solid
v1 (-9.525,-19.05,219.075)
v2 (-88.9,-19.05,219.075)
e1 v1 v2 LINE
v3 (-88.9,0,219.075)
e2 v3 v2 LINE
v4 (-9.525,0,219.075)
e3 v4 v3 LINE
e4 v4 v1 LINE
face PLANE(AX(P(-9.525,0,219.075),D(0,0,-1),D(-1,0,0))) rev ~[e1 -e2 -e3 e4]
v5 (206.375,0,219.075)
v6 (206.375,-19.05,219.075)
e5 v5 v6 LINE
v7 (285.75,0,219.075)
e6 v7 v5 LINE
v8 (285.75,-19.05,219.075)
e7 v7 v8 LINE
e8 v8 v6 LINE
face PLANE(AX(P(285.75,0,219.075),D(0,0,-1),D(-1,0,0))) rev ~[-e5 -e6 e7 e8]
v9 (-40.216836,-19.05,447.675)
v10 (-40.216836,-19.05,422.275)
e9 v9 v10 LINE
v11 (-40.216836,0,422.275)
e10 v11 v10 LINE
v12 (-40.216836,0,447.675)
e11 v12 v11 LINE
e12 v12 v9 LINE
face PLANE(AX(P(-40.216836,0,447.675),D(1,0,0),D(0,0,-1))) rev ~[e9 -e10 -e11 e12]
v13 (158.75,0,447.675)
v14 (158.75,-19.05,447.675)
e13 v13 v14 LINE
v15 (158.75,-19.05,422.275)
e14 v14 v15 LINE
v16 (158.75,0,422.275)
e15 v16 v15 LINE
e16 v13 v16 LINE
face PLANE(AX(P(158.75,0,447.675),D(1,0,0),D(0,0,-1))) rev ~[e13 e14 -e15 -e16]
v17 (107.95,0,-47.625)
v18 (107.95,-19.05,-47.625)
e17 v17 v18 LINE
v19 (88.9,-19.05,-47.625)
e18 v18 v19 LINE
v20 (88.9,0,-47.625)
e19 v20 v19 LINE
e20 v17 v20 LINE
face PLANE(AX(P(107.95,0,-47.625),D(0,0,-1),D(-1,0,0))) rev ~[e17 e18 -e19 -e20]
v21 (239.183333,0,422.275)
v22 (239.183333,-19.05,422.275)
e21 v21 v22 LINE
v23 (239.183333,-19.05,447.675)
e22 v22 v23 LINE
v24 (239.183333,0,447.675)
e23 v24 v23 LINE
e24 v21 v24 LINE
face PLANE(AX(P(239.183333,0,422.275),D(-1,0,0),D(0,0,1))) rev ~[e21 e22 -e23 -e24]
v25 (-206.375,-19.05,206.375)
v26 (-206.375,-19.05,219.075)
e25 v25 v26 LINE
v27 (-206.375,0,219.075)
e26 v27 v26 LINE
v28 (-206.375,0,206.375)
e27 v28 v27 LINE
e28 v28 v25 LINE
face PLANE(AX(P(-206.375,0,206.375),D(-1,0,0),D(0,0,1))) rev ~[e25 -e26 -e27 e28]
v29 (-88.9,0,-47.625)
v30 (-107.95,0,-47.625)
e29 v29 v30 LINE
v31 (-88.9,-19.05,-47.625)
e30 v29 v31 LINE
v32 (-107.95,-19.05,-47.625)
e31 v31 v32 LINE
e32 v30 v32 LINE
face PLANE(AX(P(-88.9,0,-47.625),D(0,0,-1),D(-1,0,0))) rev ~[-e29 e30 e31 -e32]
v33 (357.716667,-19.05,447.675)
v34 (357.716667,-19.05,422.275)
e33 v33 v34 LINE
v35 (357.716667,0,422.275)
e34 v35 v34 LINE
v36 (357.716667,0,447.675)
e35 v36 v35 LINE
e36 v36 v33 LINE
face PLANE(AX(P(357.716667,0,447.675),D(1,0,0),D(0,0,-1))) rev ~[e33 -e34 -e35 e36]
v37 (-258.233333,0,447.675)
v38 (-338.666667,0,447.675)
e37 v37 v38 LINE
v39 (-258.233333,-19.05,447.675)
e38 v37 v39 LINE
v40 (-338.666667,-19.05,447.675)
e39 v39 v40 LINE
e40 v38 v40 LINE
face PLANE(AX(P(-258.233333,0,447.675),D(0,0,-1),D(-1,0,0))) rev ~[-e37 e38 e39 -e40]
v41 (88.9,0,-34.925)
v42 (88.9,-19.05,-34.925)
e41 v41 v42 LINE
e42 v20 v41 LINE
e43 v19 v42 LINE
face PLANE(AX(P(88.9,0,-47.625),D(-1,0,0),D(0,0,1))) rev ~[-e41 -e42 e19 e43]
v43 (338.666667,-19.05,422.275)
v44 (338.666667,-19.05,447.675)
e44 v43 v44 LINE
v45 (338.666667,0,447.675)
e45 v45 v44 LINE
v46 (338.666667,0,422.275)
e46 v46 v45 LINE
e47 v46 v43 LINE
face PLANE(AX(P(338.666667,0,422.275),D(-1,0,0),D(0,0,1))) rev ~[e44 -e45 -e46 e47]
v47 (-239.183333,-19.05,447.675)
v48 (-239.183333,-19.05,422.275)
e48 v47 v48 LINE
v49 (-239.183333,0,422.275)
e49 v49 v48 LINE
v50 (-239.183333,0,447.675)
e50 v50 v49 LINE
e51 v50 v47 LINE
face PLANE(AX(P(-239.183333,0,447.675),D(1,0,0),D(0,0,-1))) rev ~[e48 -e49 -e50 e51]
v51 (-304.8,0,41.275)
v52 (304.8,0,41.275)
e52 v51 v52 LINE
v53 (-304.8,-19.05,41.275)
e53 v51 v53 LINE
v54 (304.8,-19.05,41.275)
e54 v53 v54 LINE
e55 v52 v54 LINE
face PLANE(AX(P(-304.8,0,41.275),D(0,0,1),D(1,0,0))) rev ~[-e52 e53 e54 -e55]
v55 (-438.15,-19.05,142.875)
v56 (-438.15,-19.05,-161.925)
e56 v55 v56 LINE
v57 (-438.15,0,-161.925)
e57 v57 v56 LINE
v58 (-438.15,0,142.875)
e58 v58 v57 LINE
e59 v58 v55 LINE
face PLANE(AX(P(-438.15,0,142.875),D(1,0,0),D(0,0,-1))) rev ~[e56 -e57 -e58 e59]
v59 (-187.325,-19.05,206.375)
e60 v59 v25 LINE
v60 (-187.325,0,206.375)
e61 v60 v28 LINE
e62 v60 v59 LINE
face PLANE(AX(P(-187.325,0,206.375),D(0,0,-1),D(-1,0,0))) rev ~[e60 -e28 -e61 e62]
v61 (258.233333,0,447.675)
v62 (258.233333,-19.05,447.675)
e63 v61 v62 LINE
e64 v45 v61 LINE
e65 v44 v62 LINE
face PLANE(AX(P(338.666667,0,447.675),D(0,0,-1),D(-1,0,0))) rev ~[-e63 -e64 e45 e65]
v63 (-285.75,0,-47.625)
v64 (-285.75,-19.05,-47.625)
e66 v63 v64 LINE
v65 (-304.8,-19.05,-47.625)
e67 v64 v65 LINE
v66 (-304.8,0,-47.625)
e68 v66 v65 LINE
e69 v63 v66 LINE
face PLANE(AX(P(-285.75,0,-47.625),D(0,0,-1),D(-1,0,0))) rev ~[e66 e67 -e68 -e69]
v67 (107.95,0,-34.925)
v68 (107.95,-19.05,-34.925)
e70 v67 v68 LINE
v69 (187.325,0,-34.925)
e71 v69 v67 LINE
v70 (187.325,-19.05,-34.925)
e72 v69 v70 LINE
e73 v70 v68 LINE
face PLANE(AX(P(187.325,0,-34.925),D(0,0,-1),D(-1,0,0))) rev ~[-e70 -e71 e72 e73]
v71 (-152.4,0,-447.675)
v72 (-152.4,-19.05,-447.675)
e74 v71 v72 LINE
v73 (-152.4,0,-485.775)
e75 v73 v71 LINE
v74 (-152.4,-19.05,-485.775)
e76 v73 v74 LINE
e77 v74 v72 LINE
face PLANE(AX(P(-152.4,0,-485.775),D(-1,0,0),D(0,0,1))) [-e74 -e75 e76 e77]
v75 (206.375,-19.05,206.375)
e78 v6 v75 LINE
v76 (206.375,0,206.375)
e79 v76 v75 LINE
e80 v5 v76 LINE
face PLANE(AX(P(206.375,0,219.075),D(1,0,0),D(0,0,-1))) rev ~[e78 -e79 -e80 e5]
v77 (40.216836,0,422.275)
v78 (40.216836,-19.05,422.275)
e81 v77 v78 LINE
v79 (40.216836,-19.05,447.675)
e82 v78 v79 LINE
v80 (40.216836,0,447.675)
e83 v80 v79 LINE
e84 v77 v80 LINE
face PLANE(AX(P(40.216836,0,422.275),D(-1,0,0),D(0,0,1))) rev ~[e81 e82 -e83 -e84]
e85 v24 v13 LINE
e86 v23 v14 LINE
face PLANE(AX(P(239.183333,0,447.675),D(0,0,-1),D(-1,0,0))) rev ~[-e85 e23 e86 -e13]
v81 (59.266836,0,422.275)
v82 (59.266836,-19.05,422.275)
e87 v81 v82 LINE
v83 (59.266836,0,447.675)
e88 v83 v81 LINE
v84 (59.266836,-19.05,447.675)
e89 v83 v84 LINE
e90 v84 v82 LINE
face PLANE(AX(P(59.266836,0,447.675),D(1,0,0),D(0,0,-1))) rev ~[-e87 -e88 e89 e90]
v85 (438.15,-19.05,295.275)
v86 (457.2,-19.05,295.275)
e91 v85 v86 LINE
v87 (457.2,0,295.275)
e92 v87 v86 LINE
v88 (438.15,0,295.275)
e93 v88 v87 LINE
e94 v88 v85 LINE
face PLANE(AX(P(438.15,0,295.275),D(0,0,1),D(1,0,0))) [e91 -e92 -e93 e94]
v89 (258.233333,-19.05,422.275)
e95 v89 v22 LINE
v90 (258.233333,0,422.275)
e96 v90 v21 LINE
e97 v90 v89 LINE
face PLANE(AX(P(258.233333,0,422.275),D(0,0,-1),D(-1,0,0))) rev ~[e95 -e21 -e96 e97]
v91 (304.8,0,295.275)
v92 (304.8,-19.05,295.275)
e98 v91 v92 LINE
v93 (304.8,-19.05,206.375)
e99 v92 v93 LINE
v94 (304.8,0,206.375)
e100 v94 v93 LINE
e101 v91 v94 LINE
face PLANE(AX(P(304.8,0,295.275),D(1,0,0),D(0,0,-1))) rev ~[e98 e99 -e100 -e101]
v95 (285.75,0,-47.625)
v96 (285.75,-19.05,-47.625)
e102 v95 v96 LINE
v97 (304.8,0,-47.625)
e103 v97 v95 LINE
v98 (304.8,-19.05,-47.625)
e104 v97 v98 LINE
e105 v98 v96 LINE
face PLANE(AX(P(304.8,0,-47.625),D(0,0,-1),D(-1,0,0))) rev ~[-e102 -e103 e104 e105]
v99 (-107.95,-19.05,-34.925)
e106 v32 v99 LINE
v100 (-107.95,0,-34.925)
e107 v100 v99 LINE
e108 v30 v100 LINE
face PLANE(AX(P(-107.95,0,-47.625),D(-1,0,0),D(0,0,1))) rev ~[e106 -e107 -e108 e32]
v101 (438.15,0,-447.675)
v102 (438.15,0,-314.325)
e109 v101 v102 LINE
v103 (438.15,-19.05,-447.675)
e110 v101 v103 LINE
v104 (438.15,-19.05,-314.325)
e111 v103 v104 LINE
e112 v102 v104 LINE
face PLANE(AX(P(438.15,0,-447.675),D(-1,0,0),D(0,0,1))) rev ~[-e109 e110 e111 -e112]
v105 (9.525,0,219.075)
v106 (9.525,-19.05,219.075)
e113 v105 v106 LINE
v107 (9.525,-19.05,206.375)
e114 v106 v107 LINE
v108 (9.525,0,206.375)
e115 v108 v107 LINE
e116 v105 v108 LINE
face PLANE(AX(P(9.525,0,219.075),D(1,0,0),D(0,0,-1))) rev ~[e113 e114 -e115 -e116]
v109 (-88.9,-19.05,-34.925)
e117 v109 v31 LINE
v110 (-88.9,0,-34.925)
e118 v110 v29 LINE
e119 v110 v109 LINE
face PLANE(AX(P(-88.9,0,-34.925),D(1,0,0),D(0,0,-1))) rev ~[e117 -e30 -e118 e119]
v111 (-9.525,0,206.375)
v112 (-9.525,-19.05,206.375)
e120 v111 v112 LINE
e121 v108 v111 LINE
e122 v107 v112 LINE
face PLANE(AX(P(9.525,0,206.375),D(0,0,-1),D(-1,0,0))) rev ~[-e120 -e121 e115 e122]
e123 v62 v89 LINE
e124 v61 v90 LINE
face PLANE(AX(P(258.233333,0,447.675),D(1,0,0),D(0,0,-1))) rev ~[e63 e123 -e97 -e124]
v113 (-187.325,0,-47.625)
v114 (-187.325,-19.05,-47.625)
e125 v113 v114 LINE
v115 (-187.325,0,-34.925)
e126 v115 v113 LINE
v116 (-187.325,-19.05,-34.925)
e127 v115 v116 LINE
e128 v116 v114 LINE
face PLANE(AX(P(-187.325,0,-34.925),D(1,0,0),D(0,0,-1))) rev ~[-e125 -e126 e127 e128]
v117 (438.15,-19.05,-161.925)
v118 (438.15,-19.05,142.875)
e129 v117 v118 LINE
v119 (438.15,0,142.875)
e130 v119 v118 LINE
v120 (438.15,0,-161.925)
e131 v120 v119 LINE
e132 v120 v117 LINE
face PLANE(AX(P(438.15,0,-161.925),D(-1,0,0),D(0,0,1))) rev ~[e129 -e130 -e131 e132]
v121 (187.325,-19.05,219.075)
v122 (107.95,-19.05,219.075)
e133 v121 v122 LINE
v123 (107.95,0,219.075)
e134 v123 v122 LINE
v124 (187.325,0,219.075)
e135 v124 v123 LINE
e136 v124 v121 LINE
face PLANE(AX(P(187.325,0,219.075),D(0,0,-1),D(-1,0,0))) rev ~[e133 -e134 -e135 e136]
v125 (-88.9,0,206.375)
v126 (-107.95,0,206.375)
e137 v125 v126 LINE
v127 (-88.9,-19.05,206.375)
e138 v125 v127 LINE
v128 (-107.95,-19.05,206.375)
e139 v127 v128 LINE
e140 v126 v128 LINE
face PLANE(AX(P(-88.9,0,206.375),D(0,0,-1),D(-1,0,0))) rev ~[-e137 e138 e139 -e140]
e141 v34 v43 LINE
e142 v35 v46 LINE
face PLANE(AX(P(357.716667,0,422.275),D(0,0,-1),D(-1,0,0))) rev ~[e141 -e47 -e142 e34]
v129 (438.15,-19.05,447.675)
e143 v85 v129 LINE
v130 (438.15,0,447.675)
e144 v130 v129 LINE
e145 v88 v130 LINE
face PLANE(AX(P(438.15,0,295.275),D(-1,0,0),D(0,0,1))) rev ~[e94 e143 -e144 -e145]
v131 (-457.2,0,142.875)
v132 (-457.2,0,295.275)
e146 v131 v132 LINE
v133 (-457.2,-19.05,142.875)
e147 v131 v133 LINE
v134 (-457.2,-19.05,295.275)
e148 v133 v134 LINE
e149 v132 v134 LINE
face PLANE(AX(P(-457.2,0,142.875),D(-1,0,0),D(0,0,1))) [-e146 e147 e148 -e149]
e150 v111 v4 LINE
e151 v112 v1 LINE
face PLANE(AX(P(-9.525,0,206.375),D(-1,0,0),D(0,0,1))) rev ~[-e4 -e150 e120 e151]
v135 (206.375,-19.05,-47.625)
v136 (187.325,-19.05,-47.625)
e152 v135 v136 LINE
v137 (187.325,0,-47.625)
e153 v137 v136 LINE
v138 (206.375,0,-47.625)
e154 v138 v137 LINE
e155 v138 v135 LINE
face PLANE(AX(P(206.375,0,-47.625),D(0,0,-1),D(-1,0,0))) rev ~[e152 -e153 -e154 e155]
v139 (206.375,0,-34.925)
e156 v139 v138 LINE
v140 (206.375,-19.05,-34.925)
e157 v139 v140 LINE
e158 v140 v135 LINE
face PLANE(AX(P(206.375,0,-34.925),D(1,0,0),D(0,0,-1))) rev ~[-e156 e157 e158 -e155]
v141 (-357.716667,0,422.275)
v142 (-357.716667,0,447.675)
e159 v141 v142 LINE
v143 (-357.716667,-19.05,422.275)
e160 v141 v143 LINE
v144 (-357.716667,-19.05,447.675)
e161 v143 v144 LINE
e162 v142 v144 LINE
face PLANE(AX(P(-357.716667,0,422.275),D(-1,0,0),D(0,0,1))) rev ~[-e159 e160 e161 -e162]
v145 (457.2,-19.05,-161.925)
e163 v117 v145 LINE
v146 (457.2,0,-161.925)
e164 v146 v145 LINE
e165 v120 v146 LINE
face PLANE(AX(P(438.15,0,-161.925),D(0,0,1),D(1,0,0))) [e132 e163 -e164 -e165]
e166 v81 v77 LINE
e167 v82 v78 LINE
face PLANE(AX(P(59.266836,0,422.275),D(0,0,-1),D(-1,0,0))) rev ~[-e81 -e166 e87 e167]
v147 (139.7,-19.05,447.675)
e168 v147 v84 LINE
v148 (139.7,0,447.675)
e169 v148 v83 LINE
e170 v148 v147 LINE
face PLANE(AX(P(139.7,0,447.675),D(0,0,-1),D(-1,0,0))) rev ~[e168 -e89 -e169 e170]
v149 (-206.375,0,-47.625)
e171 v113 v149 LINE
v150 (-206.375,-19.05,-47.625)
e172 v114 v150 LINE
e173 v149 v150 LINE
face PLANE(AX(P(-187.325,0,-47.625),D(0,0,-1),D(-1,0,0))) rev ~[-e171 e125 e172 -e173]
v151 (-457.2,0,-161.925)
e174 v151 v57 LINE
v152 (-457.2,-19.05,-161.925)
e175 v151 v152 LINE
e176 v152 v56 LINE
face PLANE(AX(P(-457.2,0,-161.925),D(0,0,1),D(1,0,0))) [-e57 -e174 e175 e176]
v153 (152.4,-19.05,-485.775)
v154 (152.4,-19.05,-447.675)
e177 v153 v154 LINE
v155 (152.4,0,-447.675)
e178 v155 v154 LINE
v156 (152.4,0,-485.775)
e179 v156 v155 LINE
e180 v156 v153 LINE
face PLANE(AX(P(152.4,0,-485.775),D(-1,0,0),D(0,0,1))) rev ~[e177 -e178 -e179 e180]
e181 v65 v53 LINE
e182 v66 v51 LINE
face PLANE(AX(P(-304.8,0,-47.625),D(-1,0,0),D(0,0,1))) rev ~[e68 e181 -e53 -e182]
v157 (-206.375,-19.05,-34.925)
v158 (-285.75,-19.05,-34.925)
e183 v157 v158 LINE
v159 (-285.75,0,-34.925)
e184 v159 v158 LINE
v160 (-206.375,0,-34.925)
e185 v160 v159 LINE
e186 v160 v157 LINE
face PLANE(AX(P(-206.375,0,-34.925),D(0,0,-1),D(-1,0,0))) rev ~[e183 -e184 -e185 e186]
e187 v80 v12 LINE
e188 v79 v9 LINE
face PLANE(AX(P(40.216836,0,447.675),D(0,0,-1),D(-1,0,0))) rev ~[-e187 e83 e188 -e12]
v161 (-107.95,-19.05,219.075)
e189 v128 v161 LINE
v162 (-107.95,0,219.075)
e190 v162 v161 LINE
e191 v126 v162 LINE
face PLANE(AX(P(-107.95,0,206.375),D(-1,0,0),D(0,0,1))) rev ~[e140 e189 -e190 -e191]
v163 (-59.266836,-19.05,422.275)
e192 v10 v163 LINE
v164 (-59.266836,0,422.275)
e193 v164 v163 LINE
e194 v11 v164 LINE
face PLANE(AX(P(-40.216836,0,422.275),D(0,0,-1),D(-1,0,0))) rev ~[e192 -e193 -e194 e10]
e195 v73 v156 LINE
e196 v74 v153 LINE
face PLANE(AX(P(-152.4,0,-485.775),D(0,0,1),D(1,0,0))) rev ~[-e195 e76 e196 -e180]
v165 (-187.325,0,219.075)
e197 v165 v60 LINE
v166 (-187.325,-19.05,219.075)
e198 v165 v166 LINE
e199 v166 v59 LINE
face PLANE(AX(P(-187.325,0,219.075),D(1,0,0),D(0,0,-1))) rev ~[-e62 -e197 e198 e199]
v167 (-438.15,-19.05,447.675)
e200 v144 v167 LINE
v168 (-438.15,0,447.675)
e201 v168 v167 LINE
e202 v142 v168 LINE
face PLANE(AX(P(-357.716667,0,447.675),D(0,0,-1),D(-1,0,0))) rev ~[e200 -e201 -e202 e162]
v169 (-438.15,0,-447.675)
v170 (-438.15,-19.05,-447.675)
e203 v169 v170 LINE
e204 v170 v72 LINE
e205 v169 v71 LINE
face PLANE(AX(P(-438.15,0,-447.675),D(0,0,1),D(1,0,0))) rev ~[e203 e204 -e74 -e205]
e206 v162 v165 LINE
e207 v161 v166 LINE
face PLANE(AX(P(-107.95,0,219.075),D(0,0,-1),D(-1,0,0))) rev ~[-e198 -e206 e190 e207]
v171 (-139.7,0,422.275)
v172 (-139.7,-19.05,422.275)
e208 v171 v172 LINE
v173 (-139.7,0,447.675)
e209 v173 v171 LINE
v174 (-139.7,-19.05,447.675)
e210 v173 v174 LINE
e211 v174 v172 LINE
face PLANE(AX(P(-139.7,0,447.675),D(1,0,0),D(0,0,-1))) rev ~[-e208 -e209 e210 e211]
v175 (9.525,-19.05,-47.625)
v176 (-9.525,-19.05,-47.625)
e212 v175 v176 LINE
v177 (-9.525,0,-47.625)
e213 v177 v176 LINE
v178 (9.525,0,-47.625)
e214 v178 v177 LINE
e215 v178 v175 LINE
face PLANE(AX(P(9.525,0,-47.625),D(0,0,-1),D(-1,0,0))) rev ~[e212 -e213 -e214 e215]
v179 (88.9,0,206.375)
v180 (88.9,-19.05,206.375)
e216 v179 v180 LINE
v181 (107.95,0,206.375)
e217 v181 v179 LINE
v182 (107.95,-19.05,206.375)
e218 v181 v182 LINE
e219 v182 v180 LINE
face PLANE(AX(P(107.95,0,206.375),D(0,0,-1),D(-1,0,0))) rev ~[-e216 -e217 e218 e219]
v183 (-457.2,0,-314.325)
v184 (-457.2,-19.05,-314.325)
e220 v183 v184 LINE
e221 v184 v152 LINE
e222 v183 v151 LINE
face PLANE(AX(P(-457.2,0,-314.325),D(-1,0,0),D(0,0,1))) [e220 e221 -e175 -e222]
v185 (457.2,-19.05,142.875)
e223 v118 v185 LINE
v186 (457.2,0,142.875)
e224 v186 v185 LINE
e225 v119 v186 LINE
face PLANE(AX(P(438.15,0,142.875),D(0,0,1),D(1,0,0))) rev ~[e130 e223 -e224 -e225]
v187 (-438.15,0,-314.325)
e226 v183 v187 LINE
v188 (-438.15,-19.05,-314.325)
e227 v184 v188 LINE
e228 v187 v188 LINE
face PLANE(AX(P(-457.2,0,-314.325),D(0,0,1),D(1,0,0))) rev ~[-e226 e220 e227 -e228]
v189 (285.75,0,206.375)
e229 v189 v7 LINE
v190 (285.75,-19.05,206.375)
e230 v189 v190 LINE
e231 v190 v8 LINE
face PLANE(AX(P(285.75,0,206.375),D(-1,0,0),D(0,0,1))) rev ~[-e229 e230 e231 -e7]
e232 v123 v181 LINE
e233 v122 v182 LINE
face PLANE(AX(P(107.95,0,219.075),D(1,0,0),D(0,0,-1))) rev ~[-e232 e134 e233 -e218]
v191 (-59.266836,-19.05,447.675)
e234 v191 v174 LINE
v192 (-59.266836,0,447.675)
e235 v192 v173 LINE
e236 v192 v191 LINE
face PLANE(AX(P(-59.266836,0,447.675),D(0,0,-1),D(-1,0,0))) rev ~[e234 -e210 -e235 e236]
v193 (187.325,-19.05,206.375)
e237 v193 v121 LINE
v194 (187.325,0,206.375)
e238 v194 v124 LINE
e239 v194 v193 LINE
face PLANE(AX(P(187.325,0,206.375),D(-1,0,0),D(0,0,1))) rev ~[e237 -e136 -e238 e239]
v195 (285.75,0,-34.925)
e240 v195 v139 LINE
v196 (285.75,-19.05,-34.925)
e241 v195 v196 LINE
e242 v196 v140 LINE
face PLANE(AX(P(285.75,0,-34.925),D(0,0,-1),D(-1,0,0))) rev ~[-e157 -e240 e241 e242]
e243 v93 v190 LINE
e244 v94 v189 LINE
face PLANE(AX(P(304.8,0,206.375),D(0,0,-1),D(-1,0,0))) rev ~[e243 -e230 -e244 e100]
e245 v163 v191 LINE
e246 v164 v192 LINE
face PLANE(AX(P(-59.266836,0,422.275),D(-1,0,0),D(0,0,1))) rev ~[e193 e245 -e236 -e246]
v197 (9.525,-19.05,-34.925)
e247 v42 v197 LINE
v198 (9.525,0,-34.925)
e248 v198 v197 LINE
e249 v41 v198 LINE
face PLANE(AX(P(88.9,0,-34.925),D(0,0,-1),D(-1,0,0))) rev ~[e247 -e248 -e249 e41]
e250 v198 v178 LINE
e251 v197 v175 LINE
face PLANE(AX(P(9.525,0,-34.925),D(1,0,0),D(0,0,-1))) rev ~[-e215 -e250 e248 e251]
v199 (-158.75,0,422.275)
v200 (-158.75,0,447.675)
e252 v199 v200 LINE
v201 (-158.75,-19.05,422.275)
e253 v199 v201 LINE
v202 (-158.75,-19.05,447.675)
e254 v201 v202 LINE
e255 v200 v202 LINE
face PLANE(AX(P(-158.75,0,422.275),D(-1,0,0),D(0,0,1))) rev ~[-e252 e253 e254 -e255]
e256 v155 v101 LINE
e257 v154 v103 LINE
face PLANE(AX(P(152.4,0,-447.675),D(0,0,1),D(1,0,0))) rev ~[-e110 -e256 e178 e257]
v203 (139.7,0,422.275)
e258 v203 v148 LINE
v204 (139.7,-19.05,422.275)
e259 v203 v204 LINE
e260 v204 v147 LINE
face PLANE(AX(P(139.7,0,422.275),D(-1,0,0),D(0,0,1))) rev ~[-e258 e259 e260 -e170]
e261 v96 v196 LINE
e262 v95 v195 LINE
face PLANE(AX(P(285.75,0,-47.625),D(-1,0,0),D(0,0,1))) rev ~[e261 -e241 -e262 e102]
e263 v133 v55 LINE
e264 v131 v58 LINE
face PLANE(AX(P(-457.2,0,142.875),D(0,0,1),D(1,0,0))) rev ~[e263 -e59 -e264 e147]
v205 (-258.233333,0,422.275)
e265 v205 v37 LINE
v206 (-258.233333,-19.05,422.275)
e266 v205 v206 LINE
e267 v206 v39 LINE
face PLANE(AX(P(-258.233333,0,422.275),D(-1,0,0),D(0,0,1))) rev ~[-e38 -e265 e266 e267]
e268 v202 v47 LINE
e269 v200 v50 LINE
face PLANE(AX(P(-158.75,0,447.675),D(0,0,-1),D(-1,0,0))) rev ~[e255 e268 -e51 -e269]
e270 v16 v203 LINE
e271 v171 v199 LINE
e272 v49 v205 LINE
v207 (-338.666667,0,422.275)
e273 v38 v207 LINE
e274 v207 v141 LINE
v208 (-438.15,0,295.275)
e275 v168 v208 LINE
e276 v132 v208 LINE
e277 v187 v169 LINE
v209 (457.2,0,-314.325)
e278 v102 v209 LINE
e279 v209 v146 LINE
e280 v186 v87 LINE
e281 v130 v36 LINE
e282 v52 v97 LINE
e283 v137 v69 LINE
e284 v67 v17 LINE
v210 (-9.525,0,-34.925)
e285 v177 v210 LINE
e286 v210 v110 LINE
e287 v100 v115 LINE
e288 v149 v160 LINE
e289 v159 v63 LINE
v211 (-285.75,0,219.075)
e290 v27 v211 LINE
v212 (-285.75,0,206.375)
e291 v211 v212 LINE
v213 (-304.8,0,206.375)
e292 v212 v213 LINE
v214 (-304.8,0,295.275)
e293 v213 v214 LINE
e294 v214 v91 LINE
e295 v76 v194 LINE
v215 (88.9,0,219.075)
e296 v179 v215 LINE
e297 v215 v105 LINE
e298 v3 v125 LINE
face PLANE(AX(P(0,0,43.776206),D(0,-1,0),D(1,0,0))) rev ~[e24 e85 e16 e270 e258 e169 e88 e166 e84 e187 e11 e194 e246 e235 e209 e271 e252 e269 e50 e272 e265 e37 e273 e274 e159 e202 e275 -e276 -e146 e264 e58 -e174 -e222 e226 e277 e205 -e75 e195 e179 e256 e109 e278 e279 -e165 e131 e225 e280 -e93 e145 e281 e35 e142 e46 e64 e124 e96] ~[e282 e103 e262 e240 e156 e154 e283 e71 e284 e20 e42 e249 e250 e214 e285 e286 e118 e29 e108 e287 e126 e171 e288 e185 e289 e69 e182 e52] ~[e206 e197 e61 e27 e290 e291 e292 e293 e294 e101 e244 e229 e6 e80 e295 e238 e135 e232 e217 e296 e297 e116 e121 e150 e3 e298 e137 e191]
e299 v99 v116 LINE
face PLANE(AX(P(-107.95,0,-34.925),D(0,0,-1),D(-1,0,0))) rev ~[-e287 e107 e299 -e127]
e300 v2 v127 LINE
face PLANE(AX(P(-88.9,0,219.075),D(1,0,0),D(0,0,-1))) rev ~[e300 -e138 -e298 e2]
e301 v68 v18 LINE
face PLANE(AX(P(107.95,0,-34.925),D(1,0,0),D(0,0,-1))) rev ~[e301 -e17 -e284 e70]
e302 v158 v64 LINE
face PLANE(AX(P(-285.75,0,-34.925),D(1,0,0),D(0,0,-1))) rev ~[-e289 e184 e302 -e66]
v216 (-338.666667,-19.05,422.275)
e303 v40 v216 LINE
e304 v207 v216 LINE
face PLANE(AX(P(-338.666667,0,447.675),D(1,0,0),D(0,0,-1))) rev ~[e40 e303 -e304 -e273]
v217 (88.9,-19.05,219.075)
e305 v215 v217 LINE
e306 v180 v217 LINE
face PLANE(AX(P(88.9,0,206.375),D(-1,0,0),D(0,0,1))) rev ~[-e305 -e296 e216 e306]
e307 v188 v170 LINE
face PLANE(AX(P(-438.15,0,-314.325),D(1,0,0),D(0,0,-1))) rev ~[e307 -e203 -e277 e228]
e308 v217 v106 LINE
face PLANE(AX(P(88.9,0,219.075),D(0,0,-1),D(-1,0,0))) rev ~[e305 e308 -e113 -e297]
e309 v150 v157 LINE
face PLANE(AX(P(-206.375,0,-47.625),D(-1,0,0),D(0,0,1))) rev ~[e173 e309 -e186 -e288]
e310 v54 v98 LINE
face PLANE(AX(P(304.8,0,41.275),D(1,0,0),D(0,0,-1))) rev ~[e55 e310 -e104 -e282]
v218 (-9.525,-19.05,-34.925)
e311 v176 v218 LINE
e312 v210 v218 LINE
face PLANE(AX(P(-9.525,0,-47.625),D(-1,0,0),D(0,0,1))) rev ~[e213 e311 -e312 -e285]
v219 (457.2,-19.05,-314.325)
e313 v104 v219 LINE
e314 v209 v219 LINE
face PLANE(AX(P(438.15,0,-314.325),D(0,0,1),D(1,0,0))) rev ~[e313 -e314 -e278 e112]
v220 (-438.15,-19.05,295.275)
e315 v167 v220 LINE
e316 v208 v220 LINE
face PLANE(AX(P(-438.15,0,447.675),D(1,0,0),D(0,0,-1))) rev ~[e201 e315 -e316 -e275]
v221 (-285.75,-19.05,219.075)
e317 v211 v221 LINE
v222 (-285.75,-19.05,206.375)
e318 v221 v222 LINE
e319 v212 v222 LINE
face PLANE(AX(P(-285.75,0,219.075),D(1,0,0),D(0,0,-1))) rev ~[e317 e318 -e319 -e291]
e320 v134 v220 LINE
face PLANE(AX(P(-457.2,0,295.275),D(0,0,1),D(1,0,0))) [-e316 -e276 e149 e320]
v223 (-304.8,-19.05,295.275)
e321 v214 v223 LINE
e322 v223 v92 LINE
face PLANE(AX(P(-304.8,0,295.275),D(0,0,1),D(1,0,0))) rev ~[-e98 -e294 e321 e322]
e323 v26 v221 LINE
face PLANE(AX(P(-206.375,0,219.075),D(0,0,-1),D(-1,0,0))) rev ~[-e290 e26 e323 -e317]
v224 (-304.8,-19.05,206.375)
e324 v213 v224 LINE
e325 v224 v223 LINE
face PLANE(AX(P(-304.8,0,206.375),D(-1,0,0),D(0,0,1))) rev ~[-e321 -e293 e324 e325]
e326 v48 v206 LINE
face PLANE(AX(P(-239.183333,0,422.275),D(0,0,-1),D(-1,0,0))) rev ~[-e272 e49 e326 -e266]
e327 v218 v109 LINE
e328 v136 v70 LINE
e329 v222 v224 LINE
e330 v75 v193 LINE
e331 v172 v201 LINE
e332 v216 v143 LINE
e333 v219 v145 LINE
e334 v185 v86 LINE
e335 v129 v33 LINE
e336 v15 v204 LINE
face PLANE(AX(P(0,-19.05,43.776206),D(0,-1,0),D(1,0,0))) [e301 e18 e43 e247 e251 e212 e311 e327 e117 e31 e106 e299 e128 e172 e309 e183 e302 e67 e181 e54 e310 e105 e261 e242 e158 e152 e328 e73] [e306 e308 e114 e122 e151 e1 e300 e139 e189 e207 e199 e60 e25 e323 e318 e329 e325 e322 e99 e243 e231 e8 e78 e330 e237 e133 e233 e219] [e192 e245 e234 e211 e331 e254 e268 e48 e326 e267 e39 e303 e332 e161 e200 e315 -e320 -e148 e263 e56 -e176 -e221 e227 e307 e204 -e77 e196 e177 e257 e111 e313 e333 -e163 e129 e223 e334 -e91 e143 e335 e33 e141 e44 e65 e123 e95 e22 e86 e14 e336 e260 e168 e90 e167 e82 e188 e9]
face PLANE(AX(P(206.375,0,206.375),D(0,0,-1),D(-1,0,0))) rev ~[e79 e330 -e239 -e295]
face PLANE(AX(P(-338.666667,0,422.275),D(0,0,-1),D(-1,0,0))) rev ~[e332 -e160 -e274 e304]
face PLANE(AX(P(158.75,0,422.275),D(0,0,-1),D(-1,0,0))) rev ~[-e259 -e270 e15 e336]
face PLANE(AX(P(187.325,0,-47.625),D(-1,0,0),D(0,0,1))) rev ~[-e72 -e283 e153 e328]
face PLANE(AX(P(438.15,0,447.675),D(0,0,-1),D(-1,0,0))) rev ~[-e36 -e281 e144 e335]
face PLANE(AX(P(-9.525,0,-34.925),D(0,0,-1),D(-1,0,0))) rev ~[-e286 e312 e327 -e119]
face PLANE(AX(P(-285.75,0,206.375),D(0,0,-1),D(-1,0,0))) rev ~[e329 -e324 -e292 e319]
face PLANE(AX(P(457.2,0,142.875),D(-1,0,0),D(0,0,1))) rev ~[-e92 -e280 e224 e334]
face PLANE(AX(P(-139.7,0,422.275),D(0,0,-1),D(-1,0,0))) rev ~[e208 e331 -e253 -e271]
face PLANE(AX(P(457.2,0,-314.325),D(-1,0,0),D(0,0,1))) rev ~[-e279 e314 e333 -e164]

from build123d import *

# Parameters (mm, degrees)
F0_W     = 19.05
F0_H     = 152.4
F0_W_2   = 304.8
F0_H_2   = 38.1
F1_DEPTH = 19.05


# Not quite as in the source:
# - a feature names something its author has since deleted; it is built from what else it names


with BuildPart() as f1:
    # F0 (on Front) → F1 (new body)
    with BuildSketch(Plane.XZ):
        Polygon((-438.15, -314.325), (-438.15, -447.675), (-152.4, -447.675), (152.4, -447.675), (438.15, -447.675), (438.15, -314.325), (438.15, -161.925), (438.15, 142.875), (438.15, 295.275), (438.15, 447.675), (357.7166666667, 447.675), (357.7166666667, 422.275), (338.6666666667, 422.275), (338.6666666667, 447.675), (258.2333333333, 447.675), (258.2333333333, 422.275), (239.1833333333, 422.275), (239.1833333333, 447.675), (158.75, 447.675), (158.75, 422.275), (139.7, 422.275), (139.7, 447.675), (59.266836, 447.675), (59.266836, 422.275), (40.216836, 422.275), (40.216836, 447.675), (-40.216836, 447.675), (-40.216836, 422.275), (-59.266836, 422.275), (-59.266836, 447.675), (-139.7, 447.675), (-139.7, 422.275), (-158.75, 422.275), (-158.75, 447.675), (-239.1833333333, 447.675), (-239.1833333333, 422.275), (-258.2333333333, 422.275), (-258.2333333333, 447.675), (-338.6666666667, 447.675), (-338.6666666667, 422.275), (-357.7166666667, 422.275), (-357.7166666667, 447.675), (-438.15, 447.675), (-438.15, 295.275), (-438.15, 142.875), (-438.15, -161.925), align=None)
        Polygon((-304.8, -47.625), (-304.8, -34.925), (-304.8, 41.275), (304.8, 41.275), (304.8, -34.925), (304.8, -47.625), (285.75, -47.625), (285.75, -34.925), (206.375, -34.925), (206.375, -47.625), (187.325, -47.625), (187.325, -34.925), (107.95, -34.925), (107.95, -47.625), (88.9, -47.625), (88.9, -34.925), (9.525, -34.925), (9.525, -47.625), (-9.525, -47.625), (-9.525, -34.925), (-88.9, -34.925), (-88.9, -47.625), (-107.95, -47.625), (-107.95, -34.925), (-187.325, -34.925), (-187.325, -47.625), (-206.375, -47.625), (-206.375, -34.925), (-285.75, -34.925), (-285.75, -47.625), align=None, mode=Mode.SUBTRACT)
        Polygon((-304.8, 295.275), (304.8, 295.275), (304.8, 219.075), (304.8, 206.375), (285.75, 206.375), (285.75, 219.075), (206.375, 219.075), (206.375, 206.375), (187.325, 206.375), (187.325, 219.075), (107.95, 219.075), (107.95, 206.375), (88.9, 206.375), (88.9, 219.075), (9.525, 219.075), (9.525, 206.375), (-9.525, 206.375), (-9.525, 219.075), (-88.9, 219.075), (-88.9, 206.375), (-107.95, 206.375), (-107.95, 219.075), (-187.325, 219.075), (-187.325, 206.375), (-206.375, 206.375), (-206.375, 219.075), (-285.75, 219.075), (-285.75, 206.375), (-304.8, 206.375), (-304.8, 219.075), align=None, mode=Mode.SUBTRACT)
        with Locations((-447.675, 219.075)):
            Rectangle(F0_W, F0_H)
        with Locations((-447.675, -238.125)):
            Rectangle(F0_W, F0_H)
        with Locations((447.675, 219.075)):
            Rectangle(F0_W, F0_H)
        with Locations((447.675, -238.125)):
            Rectangle(F0_W, F0_H)
        with Locations((0, -466.725)):
            Rectangle(F0_W_2, F0_H_2)
    extrude(amount=F1_DEPTH)


solid = f1.part
